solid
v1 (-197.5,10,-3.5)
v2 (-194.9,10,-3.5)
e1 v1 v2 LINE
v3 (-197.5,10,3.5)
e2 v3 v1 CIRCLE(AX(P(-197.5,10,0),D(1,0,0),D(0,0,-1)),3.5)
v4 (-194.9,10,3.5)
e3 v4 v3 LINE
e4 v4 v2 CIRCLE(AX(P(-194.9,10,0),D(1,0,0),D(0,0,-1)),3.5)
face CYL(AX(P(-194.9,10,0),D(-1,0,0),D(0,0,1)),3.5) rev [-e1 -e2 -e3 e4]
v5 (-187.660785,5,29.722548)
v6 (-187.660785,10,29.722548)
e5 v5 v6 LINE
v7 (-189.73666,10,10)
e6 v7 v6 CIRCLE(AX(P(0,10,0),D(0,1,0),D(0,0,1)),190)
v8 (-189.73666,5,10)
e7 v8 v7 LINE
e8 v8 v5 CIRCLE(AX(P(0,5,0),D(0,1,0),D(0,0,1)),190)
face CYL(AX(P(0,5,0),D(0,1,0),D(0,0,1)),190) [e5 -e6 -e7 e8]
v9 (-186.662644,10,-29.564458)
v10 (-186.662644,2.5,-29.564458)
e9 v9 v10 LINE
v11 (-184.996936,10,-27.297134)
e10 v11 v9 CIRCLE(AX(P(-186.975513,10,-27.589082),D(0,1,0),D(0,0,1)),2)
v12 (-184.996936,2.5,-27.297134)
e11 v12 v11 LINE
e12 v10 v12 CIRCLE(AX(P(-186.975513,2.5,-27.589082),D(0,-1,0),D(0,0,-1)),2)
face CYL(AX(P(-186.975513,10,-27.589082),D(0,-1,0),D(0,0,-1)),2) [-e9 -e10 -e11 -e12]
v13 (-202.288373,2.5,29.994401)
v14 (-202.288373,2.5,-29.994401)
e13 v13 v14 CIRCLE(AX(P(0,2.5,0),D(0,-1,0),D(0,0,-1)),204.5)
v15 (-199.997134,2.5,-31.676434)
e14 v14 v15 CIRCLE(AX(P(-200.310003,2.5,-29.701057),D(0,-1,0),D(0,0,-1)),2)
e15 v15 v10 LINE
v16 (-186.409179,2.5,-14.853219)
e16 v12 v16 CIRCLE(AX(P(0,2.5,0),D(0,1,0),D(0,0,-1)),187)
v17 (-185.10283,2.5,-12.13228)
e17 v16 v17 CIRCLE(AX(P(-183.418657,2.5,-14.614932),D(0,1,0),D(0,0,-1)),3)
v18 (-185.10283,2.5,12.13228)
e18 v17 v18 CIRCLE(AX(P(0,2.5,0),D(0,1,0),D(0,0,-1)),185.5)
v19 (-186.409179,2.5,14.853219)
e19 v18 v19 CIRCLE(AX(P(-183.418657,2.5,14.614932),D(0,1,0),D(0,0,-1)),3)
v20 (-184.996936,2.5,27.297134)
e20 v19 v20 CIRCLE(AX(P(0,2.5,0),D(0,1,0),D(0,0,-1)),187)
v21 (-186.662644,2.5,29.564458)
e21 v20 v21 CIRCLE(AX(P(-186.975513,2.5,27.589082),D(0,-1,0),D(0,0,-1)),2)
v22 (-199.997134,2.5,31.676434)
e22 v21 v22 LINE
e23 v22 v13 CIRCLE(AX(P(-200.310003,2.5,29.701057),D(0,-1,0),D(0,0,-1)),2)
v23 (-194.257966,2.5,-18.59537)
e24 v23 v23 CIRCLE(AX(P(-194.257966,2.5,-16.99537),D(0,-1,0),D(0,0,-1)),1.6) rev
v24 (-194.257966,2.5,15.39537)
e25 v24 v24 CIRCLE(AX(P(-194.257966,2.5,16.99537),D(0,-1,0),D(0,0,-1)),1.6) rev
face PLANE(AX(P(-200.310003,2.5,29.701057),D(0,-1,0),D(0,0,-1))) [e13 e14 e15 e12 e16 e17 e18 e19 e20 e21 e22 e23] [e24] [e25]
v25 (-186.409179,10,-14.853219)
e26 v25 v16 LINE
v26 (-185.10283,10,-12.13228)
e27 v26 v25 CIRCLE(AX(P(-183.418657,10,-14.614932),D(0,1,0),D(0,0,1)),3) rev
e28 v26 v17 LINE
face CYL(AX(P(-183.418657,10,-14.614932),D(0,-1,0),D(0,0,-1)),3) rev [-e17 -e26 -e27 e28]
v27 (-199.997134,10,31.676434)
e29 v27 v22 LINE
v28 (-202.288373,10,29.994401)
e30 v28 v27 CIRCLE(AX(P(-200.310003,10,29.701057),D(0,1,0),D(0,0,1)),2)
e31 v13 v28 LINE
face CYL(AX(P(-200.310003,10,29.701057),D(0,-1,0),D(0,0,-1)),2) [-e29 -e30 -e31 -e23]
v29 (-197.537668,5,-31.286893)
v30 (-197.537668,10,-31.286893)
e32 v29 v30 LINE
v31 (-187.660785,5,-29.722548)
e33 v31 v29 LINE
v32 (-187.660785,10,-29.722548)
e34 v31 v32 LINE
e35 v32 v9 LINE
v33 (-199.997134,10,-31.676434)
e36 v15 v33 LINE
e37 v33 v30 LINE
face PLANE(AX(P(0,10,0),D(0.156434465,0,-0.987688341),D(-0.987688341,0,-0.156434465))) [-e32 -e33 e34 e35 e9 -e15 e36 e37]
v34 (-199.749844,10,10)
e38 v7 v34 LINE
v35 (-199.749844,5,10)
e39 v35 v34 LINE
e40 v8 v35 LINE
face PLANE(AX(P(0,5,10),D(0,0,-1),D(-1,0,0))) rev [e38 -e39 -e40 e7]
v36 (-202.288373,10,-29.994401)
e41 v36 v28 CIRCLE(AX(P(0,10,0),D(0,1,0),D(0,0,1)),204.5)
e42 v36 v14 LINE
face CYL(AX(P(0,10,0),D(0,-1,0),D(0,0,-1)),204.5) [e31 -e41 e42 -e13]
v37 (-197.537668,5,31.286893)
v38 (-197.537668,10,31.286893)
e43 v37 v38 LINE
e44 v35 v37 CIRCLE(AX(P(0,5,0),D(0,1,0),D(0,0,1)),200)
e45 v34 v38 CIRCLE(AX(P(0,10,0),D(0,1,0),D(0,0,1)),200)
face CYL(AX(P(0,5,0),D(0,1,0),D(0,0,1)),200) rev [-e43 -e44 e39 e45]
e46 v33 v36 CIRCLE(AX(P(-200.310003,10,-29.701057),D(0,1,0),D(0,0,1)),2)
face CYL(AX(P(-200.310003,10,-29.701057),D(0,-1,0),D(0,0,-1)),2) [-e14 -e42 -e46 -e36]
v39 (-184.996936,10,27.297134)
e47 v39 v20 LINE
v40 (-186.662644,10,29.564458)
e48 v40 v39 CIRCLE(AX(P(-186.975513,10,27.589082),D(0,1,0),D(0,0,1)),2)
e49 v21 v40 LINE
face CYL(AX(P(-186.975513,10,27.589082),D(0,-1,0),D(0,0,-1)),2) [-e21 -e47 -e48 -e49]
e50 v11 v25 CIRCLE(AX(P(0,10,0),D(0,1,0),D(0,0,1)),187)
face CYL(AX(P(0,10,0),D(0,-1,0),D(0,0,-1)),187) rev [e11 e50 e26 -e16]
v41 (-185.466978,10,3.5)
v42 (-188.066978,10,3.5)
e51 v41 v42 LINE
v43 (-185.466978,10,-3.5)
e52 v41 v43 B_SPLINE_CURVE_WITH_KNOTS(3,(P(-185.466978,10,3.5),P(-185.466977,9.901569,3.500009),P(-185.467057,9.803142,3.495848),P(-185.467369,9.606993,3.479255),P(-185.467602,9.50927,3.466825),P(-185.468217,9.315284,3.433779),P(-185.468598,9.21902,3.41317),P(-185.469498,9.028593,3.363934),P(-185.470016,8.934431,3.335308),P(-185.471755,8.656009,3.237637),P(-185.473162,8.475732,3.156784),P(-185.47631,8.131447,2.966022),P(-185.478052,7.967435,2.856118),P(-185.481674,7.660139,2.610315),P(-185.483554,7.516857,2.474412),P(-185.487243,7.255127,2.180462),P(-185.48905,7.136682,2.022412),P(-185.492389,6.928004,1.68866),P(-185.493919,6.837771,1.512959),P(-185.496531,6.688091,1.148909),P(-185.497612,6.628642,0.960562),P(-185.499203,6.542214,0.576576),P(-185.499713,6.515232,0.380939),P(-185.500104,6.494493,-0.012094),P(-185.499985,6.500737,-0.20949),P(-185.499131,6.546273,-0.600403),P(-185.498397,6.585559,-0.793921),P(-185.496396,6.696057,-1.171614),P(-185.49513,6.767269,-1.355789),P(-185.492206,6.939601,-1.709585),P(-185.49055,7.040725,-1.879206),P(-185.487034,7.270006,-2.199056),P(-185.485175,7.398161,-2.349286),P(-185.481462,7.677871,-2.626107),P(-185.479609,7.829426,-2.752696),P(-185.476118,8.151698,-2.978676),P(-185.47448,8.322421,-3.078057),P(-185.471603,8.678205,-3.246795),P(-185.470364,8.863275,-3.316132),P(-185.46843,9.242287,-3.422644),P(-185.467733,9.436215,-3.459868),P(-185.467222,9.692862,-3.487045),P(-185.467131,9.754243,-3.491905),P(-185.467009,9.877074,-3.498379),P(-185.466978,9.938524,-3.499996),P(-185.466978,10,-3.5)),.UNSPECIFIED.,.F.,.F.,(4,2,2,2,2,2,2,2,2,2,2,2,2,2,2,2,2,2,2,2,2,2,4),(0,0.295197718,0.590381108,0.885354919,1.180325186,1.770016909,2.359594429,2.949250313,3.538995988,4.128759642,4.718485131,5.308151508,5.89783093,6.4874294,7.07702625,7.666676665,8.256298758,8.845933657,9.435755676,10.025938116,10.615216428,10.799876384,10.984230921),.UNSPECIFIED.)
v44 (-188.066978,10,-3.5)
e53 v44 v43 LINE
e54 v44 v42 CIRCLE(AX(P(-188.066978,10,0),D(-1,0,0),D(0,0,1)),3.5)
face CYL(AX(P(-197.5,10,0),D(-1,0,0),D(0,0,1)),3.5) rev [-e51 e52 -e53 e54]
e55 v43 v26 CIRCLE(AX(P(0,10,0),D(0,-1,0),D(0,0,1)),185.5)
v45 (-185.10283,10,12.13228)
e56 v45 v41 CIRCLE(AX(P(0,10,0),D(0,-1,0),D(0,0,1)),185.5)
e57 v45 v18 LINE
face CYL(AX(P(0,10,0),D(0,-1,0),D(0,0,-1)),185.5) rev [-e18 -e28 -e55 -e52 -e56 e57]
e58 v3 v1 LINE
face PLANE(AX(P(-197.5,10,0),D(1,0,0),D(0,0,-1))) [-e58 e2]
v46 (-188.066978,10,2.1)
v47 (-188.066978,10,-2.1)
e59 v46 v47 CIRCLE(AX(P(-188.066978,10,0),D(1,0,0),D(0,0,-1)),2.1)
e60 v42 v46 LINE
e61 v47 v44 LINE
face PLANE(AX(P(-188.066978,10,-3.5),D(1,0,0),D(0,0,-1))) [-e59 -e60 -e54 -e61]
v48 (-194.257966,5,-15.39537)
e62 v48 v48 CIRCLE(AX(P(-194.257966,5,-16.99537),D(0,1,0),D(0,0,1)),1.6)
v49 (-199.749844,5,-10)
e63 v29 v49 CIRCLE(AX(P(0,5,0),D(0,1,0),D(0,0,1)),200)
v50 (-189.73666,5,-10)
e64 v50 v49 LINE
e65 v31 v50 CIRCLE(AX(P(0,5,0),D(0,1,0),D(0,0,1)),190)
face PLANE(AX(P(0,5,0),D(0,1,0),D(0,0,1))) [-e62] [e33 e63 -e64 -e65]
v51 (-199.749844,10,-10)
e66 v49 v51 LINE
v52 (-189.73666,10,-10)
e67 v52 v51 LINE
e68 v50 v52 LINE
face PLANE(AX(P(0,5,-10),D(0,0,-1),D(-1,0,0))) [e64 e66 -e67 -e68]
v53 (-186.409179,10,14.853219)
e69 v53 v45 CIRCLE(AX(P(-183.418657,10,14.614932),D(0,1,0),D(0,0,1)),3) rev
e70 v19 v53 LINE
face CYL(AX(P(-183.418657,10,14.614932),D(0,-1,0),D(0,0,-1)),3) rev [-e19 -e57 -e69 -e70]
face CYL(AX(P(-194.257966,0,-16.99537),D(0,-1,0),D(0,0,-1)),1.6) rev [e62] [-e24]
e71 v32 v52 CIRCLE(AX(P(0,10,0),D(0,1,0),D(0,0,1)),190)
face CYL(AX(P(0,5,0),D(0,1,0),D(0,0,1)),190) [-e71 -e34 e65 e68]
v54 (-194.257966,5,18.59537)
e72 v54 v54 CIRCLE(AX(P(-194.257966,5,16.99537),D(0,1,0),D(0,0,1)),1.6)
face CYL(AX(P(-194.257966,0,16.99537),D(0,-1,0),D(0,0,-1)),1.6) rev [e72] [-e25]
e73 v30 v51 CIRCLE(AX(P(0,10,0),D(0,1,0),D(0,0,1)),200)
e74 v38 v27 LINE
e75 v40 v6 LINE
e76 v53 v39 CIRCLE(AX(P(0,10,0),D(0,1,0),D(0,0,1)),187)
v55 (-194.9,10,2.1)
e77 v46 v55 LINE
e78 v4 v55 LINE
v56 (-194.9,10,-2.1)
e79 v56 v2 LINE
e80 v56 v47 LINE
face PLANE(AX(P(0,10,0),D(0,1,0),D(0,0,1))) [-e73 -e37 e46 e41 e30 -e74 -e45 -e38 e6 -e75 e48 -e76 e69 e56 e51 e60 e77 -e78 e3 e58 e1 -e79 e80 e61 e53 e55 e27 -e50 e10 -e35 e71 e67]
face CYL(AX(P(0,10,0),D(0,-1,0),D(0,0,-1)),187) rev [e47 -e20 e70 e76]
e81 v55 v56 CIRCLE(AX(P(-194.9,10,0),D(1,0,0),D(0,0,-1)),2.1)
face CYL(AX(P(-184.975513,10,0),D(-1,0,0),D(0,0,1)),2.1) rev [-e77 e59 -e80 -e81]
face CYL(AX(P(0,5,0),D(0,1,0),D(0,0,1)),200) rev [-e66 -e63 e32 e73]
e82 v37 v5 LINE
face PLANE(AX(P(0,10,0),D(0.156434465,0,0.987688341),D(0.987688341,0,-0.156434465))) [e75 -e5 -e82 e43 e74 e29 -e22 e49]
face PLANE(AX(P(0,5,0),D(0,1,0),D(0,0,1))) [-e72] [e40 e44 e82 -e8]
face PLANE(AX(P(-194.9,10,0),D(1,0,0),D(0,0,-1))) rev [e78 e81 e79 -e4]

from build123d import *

# Parameters (mm, degrees)
BOSS_EXTRUDE1_DEPTH        = 10
CUT_EXTRUDE1_DEPTH         = 5
F_3_2_3_2_DIAMETER_HOLE1_D = 3.2
BOSS_EXTRUDE2_DEPTH        = 10
FILLET1_R                  = 3
FILLET2_R                  = 2
SKETCH21_R                 = 2.1
CUT_EXTRUDE2_DEPTH         = 36.522103107
SKETCH22_R                 = 3.5
CUT_EXTRUDE3_DEPTH         = 2.6
CUT_EXTRUDE6_DEPTH         = 2.5
SKETCH27_W                 = 2.6
SKETCH27_H                 = 3.5


with BuildPart() as part:
    # Sketch1 → Boss-Extrude1 (new body)
    with BuildSketch(Plane(origin=(0, 0, 0), x_dir=(1, 0, 0), z_dir=(0, 1, 0))):
        with BuildLine():
            ThreePointArc((-187.660784713, 29.722548358), (-190, 0), (-187.660784713, -29.722548358))
            Line((-187.660784713, -29.722548358), (-197.537668119, -31.286893008))
            ThreePointArc((-197.537668119, -31.286893008), (-200, 0), (-197.537668119, 31.286893008))
            Line((-197.537668119, 31.286893008), (-187.660784713, 29.722548358))
        make_face()
        with BuildLine():
            ThreePointArc((-197.537668119, -31.286893008), (-200, 0), (-197.537668119, 31.286893008))
            Line((-197.537668119, 31.286893008), (-201.982265652, 31.990848101))
            ThreePointArc((-201.982265652, 31.990848101), (-204.5, 0), (-201.982265652, -31.990848101))
            Line((-201.982265652, -31.990848101), (-197.537668119, -31.286893008))
        make_face()
        with BuildLine():
            Line((-184.697719691, 29.253244963), (-187.660784713, 29.722548358))
            ThreePointArc((-187.660784713, 29.722548358), (-190, 0), (-187.660784713, -29.722548358))
            Line((-187.660784713, -29.722548358), (-184.697719691, -29.253244963))
            ThreePointArc((-184.697719691, -29.253244963), (-187, 0), (-184.697719691, 29.253244963))
        make_face()
    extrude(amount=BOSS_EXTRUDE1_DEPTH)

    # Sketch15 → Cut-Extrude1 (cut)
    with BuildSketch(Plane(origin=(0, 10, 0), x_dir=(1, 0, 0), z_dir=(0, 1, 0))):
        with BuildLine():
            Line((-199.749843554, 10), (-189.73665961, 10))
            ThreePointArc((-189.73665961, 10), (-188.956218405, 19.88837666), (-187.660784713, 29.722548358))
            Line((-187.660784713, 29.722548358), (-197.537668119, 31.286893008))
            ThreePointArc((-197.537668119, 31.286893008), (-198.928692466, 20.673057674), (-199.749843554, 10))
        make_face()
        with BuildLine():
            ThreePointArc((-187.660784713, -29.722548358), (-188.956218405, -19.88837666), (-189.73665961, -10))
            Line((-189.73665961, -10), (-199.749843554, -10))
            ThreePointArc((-199.749843554, -10), (-198.928692466, -20.673057674), (-197.537668119, -31.286893008))
            Line((-197.537668119, -31.286893008), (-187.660784713, -29.722548358))
        make_face()
    extrude(amount=-CUT_EXTRUDE1_DEPTH, mode=Mode.SUBTRACT)

    # Ø3.2 (3.2) Diameter Hole1 (through all)
    with Locations(Plane(origin=(0, 0, 0), x_dir=(-1, 0, 0), z_dir=(0, -1, 0))):
        with Locations((194.257966128, -16.995369836), (194.257966128, 16.995369836)):
            Hole(F_3_2_3_2_DIAMETER_HOLE1_D / 2)

    # Sketch19 → Boss-Extrude2 (add)
    with BuildSketch(Plane(origin=(0, 0, 0), x_dir=(1, 0, 0), z_dir=(0, 1, 0))):
        with BuildLine():
            Line((-185.102830261, -12.132280472), (-186.599618646, -12.230385166))
            ThreePointArc((-186.599618646, -12.230385166), (-187, 0), (-186.599618646, 12.230385166))
            Line((-186.599618646, 12.230385166), (-185.102830261, 12.132280472))
            ThreePointArc((-185.102830261, 12.132280472), (-185.5, 0), (-185.102830261, -12.132280472))
        make_face()
    extrude(amount=BOSS_EXTRUDE2_DEPTH)

    # Fillet1
    # the kernel refuses this fillet: 3 mm, written as the material it adds along each edge
    with BuildSketch(Plane(origin=(-186.599618646, 0, -12.230385166), x_dir=(0.07241784502459461, 0, -0.9973743809232287), z_dir=(0, 1, 0))) as fillet1_piece_1:
        with BuildLine():
            CenterArc((2.608644701, -2.999925838), FILLET1_R, 89.597127862, 60.403689883)
            Line((0.010547081, -1.499962919), (-0.041414871, -1.469963661))
            ThreePointArc((-0.041414871, -1.469963661), (-0.054724976, -0.750403343), (-0.059998517, -0.000421883))
            Line((-0.059998517, -0.000421883), (-0.000421883, 0.059998517))
            ThreePointArc((-0.000421883, 0.059998517), (1.314869431, 0.064622735), (2.630160746, 0.059998517))
            Line((2.630160746, 0.059998517), (2.629738863, 0))
        make_face()
    extrude(amount=10)
    with BuildSketch(Plane(origin=(-186.599618646, 0, 12.230385166), x_dir=(0.0724178450245846, 0, 0.9973743809232295), z_dir=(0, 1, 0))) as fillet1_piece_2:
        with BuildLine():
            CenterArc((2.608644701, 2.999925838), FILLET1_R, 209.999182255, 60.403689883)
            Line((0.010547081, 1.499962919), (-0.041414871, 1.469963661))
            ThreePointArc((-0.041414871, 1.469963661), (-0.054724976, 0.750403343), (-0.059998517, 0.000421883))
            Line((-0.059998517, 0.000421883), (-0.000421883, -0.059998517))
            ThreePointArc((-0.000421883, -0.059998517), (1.314869431, -0.064622735), (2.630160746, -0.059998517))
            Line((2.630160746, -0.059998517), (2.629738863, 0))
        make_face()
    extrude(amount=10)

    # Fillet2
    fillet2_edges = [part.edges().sort_by_distance(p)[0] for p in [
        (-201.982265652, 5, 31.990848101),
        (-201.982265652, 5, -31.990848101),
        (-184.697719691, 5, -29.253244963),
        (-184.697719691, 5, 29.253244963),
    ]]
    fillet(fillet2_edges, radius=FILLET2_R)

    # Sketch21 → Cut-Extrude2 (cut, through all)
    with BuildSketch(Plane(origin=(-197.5, 0, 0), x_dir=(0, 0, -1), z_dir=(1, 0, 0))):
        with Locations((0, 10)):
            Circle(SKETCH21_R)
    extrude(amount=CUT_EXTRUDE2_DEPTH, mode=Mode.SUBTRACT)

    # Sketch22 → Cut-Extrude3 (cut)
    with BuildSketch(Plane(origin=(-197.5, 0, 0), x_dir=(0, 0, -1), z_dir=(1, 0, 0))):
        with Locations((0, 10)):
            Circle(SKETCH22_R)
    extrude(amount=CUT_EXTRUDE3_DEPTH, mode=Mode.SUBTRACT)

    # Sketch26 → Cut-Extrude6 (cut)
    with BuildSketch(Plane.XZ):
        with BuildLine():
            Line((-199.997133786, -31.676434101), (-186.662644351, -29.564458455))
            ThreePointArc((-186.662644351, -29.564458455), (-185.363721979, -28.773196969), (-184.996936421, -27.297133819))
            ThreePointArc((-184.996936421, -27.297133819), (-185.807261228, -21.087002508), (-186.409178624, -14.853219336))
            ThreePointArc((-186.409178624, -14.853219336), (-186.123110766, -13.316498702), (-185.102830261, -12.132280472))
            ThreePointArc((-185.102830261, -12.132280472), (-185.5, 0), (-185.102830261, 12.132280472))
            ThreePointArc((-185.102830261, 12.132280472), (-186.123110766, 13.316498702), (-186.409178624, 14.853219336))
            ThreePointArc((-186.409178624, 14.853219336), (-185.807261228, 21.087002508), (-184.996936421, 27.297133819))
            ThreePointArc((-184.996936421, 27.297133819), (-185.363721979, 28.773196969), (-186.662644351, 29.564458455))
            Line((-186.662644351, 29.564458455), (-199.997133786, 31.676434101))
            ThreePointArc((-199.997133786, 31.676434101), (-201.493549275, 31.313266322), (-202.288373113, 29.994401197))
            ThreePointArc((-202.288373113, 29.994401197), (-204.5, 0), (-202.288373113, -29.994401197))
            ThreePointArc((-202.288373113, -29.994401197), (-201.493549275, -31.313266322), (-199.997133786, -31.676434101))
        make_face()
    extrude(amount=-CUT_EXTRUDE6_DEPTH, mode=Mode.SUBTRACT)

    # Sketch27 → Cut-Revolve3 (revolve, cut)
    with BuildSketch(Plane(origin=(0, 10, 0), x_dir=(1, 0, 0), z_dir=(0, 1, 0))):
        with Locations((-186.766978193, 1.75)):
            Rectangle(SKETCH27_W, SKETCH27_H)
    revolve(axis=Axis((-197.5, 10, 0), (1, 0, 0)), mode=Mode.SUBTRACT)


solid = part.part
